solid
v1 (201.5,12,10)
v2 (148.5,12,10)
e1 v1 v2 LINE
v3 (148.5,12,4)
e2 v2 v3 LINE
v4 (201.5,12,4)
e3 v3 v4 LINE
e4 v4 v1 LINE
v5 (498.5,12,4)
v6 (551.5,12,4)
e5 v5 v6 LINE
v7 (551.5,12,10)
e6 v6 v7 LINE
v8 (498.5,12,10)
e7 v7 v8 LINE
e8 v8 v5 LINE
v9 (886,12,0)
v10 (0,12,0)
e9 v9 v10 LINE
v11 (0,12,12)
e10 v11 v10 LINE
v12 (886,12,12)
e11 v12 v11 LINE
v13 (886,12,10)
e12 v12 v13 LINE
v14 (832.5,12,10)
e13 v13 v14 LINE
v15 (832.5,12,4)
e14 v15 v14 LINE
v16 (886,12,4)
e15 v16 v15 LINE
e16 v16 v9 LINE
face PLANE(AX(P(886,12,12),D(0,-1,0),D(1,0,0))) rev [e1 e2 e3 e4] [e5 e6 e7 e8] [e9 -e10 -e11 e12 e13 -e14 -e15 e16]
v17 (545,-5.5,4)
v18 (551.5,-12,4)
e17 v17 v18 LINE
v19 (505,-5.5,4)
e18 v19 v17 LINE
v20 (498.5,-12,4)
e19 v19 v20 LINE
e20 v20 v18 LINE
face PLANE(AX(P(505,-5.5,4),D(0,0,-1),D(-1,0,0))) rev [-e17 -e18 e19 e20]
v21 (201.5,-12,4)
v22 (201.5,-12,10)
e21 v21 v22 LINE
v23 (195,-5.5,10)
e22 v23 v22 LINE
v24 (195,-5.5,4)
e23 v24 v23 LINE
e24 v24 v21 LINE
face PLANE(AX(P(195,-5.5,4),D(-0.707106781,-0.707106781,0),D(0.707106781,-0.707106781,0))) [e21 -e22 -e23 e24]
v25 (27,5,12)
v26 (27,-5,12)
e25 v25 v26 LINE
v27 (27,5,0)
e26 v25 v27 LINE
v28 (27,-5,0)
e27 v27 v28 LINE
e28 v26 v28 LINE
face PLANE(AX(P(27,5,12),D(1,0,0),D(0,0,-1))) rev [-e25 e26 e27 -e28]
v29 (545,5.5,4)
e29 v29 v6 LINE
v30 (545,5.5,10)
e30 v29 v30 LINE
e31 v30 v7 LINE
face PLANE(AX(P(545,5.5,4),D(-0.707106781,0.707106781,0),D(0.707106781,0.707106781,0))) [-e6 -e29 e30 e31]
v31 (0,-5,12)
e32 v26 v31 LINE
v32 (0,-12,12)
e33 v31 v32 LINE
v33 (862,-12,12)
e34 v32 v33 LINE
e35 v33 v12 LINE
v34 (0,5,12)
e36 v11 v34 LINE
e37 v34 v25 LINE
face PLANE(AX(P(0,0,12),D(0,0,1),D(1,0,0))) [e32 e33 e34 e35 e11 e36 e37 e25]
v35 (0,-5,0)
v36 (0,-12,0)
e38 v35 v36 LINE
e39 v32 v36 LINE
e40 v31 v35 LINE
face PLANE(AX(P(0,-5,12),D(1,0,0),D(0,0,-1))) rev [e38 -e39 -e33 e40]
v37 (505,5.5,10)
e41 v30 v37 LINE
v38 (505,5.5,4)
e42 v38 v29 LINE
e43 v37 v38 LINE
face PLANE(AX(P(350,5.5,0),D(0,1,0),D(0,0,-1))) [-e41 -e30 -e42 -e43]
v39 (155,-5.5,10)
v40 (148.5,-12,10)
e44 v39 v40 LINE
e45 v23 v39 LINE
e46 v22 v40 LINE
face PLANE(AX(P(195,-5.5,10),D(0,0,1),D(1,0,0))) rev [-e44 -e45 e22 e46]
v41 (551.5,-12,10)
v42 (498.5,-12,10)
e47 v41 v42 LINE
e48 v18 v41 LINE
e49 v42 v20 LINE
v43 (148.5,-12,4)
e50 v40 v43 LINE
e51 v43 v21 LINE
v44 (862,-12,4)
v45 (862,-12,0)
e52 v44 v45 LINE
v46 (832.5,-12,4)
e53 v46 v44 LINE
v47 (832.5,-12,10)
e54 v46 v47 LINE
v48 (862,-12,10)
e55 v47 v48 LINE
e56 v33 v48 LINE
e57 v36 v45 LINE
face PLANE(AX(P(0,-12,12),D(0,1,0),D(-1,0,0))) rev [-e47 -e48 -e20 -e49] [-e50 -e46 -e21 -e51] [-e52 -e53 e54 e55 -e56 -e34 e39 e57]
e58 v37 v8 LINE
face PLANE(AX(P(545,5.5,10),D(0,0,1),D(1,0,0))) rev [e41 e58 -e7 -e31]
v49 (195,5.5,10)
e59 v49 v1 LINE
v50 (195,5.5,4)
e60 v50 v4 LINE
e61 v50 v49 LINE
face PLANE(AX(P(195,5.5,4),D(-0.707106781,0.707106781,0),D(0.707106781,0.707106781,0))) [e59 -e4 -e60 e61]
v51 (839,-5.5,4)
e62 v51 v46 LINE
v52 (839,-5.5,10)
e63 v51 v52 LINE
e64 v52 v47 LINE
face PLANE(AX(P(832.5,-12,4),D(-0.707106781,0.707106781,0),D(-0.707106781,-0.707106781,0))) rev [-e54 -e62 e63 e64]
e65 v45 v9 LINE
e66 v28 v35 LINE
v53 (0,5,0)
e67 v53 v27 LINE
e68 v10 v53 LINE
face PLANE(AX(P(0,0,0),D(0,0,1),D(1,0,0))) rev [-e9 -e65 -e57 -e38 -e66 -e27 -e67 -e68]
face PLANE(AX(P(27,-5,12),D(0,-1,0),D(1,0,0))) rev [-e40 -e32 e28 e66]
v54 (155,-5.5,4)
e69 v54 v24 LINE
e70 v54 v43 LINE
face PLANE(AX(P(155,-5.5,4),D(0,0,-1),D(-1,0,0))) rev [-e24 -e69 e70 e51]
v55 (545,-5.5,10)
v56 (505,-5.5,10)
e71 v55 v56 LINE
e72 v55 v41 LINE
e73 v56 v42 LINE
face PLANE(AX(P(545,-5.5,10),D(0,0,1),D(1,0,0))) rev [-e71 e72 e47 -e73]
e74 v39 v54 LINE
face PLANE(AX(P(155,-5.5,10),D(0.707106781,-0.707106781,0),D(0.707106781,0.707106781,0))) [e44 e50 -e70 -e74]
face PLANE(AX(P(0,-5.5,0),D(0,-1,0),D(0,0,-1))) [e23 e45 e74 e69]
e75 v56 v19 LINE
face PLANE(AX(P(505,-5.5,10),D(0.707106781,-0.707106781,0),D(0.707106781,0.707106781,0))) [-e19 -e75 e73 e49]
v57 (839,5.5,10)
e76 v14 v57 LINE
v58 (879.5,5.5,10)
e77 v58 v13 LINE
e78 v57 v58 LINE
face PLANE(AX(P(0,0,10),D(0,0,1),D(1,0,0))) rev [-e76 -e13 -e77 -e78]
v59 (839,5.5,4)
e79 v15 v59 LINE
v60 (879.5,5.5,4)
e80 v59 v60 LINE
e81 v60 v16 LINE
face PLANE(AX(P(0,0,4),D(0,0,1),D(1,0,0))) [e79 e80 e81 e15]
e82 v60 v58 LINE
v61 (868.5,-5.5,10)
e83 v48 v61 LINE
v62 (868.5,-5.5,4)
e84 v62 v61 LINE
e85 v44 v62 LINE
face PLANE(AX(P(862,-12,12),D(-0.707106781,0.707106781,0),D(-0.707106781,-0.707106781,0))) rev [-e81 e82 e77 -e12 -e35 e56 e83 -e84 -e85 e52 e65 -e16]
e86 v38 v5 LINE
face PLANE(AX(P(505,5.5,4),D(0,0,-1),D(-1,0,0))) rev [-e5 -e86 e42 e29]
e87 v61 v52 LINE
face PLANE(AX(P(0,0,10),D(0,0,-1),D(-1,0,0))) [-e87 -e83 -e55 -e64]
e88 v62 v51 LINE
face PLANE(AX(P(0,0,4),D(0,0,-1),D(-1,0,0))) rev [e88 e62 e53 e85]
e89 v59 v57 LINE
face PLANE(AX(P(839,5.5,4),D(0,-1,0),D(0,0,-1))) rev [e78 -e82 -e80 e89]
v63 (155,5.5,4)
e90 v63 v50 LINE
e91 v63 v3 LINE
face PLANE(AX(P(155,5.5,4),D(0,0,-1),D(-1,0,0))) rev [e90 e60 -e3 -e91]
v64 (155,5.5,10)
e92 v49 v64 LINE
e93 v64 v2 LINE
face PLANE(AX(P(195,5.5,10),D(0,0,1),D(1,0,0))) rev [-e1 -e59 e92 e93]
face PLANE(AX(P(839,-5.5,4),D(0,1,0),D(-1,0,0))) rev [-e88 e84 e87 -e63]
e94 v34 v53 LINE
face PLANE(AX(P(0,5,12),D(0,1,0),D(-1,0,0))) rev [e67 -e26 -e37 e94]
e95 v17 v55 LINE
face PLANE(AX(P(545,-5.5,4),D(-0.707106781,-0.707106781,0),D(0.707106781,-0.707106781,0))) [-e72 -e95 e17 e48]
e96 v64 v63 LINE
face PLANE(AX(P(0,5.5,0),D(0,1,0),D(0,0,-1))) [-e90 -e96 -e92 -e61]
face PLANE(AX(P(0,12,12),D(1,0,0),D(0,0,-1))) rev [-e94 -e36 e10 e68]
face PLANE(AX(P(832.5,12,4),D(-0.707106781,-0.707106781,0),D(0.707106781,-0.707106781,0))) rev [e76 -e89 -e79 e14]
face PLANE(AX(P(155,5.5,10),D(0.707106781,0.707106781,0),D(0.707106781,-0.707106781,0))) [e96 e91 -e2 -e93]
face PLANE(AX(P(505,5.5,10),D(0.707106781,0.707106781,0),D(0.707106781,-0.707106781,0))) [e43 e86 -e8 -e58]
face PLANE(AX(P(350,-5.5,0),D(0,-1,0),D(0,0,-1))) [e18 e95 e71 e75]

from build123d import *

# Parameters (mm, degrees)
EXTRUDE_1_DEPTH        = 12
SKETCH_2_W             = 40
SKETCH_2_H             = 6
CUT_EXTRUDE_1_DEPTH    = 6.5
DRAFT_1_ANGLE          = 45
DRAFT_2_ANGLE          = 45
PATTERN_START          = 4
PATTERN_LINEAR_1_DEPTH = 6
MIRROR_START           = 4
MIRROR_2_DEPTH         = 6
CUT_EXTRUDE_START      = -2
CUT_EXTRUDE_2_DEPTH    = 6


# Read off the part's stored shape, not the designer's step: 阵列(线性)1, 镜向2
with BuildPart() as part:
    # 草图1 → 凸台-拉伸1 (new body)
    with BuildSketch(Plane.XY):
        Polygon((0, 12), (0, 5), (27, 5), (27, -5), (0, -5), (0, -12), (862, -12), (886, 12), align=None)
    extrude(amount=EXTRUDE_1_DEPTH)

    # 草图2 → 切除-拉伸1 (cut)
    with BuildSketch(Plane.XZ.offset(12)):
        with Locations((175, 7)):
            Rectangle(SKETCH_2_W, SKETCH_2_H)
    extrude(amount=-CUT_EXTRUDE_1_DEPTH, mode=Mode.SUBTRACT)

    # 拔模1
    draft_1_faces = [part.faces().sort_by_distance(p)[0] for p in [
        (155, -8.75, 7),
    ]]
    draft(draft_1_faces, Plane(origin=(0, -5.5, 0), x_dir=(0, 0, -1), z_dir=(0, -1, 0)), DRAFT_1_ANGLE)

    # 拔模2
    draft_2_faces = [part.faces().sort_by_distance(p)[0] for p in [
        (195, -8.75, 7),
    ]]
    draft(draft_2_faces, Plane(origin=(0, -5.5, 0), x_dir=(0, 0, -1), z_dir=(0, -1, 0)), DRAFT_2_ANGLE)

    # 阵列(线性)1 outline → 阵列(线性)1 (cut)
    with BuildSketch(Plane.XY.offset(PATTERN_START)):
        Polygon((551.5, -12), (545, -5.5), (505, -5.5), (498.5, -12), align=None)
    extrude(amount=PATTERN_LINEAR_1_DEPTH, mode=Mode.SUBTRACT)

    # 镜向2 outline → 镜向2 (cut)
    with BuildSketch(Plane.XY.offset(MIRROR_START)):
        Polygon((195, 5.5), (201.5, 12), (148.5, 12), (155, 5.5), align=None)
        Polygon((545, 5.5), (551.5, 12), (498.5, 12), (505, 5.5), align=None)
    extrude(amount=MIRROR_2_DEPTH, mode=Mode.SUBTRACT)

    # 草图4 → 切除-拉伸2 (cut)
    with BuildSketch(Plane.XY.offset(12).offset(CUT_EXTRUDE_START)):
        Polygon((832.5, 12), (839, 5.5), (879.5, 5.5), (886, 12), align=None)
        Polygon((832.5, -12), (839, -5.5), (868.5, -5.5), (862, -12), align=None)
    extrude(amount=-CUT_EXTRUDE_2_DEPTH, mode=Mode.SUBTRACT)


solid = part.part
